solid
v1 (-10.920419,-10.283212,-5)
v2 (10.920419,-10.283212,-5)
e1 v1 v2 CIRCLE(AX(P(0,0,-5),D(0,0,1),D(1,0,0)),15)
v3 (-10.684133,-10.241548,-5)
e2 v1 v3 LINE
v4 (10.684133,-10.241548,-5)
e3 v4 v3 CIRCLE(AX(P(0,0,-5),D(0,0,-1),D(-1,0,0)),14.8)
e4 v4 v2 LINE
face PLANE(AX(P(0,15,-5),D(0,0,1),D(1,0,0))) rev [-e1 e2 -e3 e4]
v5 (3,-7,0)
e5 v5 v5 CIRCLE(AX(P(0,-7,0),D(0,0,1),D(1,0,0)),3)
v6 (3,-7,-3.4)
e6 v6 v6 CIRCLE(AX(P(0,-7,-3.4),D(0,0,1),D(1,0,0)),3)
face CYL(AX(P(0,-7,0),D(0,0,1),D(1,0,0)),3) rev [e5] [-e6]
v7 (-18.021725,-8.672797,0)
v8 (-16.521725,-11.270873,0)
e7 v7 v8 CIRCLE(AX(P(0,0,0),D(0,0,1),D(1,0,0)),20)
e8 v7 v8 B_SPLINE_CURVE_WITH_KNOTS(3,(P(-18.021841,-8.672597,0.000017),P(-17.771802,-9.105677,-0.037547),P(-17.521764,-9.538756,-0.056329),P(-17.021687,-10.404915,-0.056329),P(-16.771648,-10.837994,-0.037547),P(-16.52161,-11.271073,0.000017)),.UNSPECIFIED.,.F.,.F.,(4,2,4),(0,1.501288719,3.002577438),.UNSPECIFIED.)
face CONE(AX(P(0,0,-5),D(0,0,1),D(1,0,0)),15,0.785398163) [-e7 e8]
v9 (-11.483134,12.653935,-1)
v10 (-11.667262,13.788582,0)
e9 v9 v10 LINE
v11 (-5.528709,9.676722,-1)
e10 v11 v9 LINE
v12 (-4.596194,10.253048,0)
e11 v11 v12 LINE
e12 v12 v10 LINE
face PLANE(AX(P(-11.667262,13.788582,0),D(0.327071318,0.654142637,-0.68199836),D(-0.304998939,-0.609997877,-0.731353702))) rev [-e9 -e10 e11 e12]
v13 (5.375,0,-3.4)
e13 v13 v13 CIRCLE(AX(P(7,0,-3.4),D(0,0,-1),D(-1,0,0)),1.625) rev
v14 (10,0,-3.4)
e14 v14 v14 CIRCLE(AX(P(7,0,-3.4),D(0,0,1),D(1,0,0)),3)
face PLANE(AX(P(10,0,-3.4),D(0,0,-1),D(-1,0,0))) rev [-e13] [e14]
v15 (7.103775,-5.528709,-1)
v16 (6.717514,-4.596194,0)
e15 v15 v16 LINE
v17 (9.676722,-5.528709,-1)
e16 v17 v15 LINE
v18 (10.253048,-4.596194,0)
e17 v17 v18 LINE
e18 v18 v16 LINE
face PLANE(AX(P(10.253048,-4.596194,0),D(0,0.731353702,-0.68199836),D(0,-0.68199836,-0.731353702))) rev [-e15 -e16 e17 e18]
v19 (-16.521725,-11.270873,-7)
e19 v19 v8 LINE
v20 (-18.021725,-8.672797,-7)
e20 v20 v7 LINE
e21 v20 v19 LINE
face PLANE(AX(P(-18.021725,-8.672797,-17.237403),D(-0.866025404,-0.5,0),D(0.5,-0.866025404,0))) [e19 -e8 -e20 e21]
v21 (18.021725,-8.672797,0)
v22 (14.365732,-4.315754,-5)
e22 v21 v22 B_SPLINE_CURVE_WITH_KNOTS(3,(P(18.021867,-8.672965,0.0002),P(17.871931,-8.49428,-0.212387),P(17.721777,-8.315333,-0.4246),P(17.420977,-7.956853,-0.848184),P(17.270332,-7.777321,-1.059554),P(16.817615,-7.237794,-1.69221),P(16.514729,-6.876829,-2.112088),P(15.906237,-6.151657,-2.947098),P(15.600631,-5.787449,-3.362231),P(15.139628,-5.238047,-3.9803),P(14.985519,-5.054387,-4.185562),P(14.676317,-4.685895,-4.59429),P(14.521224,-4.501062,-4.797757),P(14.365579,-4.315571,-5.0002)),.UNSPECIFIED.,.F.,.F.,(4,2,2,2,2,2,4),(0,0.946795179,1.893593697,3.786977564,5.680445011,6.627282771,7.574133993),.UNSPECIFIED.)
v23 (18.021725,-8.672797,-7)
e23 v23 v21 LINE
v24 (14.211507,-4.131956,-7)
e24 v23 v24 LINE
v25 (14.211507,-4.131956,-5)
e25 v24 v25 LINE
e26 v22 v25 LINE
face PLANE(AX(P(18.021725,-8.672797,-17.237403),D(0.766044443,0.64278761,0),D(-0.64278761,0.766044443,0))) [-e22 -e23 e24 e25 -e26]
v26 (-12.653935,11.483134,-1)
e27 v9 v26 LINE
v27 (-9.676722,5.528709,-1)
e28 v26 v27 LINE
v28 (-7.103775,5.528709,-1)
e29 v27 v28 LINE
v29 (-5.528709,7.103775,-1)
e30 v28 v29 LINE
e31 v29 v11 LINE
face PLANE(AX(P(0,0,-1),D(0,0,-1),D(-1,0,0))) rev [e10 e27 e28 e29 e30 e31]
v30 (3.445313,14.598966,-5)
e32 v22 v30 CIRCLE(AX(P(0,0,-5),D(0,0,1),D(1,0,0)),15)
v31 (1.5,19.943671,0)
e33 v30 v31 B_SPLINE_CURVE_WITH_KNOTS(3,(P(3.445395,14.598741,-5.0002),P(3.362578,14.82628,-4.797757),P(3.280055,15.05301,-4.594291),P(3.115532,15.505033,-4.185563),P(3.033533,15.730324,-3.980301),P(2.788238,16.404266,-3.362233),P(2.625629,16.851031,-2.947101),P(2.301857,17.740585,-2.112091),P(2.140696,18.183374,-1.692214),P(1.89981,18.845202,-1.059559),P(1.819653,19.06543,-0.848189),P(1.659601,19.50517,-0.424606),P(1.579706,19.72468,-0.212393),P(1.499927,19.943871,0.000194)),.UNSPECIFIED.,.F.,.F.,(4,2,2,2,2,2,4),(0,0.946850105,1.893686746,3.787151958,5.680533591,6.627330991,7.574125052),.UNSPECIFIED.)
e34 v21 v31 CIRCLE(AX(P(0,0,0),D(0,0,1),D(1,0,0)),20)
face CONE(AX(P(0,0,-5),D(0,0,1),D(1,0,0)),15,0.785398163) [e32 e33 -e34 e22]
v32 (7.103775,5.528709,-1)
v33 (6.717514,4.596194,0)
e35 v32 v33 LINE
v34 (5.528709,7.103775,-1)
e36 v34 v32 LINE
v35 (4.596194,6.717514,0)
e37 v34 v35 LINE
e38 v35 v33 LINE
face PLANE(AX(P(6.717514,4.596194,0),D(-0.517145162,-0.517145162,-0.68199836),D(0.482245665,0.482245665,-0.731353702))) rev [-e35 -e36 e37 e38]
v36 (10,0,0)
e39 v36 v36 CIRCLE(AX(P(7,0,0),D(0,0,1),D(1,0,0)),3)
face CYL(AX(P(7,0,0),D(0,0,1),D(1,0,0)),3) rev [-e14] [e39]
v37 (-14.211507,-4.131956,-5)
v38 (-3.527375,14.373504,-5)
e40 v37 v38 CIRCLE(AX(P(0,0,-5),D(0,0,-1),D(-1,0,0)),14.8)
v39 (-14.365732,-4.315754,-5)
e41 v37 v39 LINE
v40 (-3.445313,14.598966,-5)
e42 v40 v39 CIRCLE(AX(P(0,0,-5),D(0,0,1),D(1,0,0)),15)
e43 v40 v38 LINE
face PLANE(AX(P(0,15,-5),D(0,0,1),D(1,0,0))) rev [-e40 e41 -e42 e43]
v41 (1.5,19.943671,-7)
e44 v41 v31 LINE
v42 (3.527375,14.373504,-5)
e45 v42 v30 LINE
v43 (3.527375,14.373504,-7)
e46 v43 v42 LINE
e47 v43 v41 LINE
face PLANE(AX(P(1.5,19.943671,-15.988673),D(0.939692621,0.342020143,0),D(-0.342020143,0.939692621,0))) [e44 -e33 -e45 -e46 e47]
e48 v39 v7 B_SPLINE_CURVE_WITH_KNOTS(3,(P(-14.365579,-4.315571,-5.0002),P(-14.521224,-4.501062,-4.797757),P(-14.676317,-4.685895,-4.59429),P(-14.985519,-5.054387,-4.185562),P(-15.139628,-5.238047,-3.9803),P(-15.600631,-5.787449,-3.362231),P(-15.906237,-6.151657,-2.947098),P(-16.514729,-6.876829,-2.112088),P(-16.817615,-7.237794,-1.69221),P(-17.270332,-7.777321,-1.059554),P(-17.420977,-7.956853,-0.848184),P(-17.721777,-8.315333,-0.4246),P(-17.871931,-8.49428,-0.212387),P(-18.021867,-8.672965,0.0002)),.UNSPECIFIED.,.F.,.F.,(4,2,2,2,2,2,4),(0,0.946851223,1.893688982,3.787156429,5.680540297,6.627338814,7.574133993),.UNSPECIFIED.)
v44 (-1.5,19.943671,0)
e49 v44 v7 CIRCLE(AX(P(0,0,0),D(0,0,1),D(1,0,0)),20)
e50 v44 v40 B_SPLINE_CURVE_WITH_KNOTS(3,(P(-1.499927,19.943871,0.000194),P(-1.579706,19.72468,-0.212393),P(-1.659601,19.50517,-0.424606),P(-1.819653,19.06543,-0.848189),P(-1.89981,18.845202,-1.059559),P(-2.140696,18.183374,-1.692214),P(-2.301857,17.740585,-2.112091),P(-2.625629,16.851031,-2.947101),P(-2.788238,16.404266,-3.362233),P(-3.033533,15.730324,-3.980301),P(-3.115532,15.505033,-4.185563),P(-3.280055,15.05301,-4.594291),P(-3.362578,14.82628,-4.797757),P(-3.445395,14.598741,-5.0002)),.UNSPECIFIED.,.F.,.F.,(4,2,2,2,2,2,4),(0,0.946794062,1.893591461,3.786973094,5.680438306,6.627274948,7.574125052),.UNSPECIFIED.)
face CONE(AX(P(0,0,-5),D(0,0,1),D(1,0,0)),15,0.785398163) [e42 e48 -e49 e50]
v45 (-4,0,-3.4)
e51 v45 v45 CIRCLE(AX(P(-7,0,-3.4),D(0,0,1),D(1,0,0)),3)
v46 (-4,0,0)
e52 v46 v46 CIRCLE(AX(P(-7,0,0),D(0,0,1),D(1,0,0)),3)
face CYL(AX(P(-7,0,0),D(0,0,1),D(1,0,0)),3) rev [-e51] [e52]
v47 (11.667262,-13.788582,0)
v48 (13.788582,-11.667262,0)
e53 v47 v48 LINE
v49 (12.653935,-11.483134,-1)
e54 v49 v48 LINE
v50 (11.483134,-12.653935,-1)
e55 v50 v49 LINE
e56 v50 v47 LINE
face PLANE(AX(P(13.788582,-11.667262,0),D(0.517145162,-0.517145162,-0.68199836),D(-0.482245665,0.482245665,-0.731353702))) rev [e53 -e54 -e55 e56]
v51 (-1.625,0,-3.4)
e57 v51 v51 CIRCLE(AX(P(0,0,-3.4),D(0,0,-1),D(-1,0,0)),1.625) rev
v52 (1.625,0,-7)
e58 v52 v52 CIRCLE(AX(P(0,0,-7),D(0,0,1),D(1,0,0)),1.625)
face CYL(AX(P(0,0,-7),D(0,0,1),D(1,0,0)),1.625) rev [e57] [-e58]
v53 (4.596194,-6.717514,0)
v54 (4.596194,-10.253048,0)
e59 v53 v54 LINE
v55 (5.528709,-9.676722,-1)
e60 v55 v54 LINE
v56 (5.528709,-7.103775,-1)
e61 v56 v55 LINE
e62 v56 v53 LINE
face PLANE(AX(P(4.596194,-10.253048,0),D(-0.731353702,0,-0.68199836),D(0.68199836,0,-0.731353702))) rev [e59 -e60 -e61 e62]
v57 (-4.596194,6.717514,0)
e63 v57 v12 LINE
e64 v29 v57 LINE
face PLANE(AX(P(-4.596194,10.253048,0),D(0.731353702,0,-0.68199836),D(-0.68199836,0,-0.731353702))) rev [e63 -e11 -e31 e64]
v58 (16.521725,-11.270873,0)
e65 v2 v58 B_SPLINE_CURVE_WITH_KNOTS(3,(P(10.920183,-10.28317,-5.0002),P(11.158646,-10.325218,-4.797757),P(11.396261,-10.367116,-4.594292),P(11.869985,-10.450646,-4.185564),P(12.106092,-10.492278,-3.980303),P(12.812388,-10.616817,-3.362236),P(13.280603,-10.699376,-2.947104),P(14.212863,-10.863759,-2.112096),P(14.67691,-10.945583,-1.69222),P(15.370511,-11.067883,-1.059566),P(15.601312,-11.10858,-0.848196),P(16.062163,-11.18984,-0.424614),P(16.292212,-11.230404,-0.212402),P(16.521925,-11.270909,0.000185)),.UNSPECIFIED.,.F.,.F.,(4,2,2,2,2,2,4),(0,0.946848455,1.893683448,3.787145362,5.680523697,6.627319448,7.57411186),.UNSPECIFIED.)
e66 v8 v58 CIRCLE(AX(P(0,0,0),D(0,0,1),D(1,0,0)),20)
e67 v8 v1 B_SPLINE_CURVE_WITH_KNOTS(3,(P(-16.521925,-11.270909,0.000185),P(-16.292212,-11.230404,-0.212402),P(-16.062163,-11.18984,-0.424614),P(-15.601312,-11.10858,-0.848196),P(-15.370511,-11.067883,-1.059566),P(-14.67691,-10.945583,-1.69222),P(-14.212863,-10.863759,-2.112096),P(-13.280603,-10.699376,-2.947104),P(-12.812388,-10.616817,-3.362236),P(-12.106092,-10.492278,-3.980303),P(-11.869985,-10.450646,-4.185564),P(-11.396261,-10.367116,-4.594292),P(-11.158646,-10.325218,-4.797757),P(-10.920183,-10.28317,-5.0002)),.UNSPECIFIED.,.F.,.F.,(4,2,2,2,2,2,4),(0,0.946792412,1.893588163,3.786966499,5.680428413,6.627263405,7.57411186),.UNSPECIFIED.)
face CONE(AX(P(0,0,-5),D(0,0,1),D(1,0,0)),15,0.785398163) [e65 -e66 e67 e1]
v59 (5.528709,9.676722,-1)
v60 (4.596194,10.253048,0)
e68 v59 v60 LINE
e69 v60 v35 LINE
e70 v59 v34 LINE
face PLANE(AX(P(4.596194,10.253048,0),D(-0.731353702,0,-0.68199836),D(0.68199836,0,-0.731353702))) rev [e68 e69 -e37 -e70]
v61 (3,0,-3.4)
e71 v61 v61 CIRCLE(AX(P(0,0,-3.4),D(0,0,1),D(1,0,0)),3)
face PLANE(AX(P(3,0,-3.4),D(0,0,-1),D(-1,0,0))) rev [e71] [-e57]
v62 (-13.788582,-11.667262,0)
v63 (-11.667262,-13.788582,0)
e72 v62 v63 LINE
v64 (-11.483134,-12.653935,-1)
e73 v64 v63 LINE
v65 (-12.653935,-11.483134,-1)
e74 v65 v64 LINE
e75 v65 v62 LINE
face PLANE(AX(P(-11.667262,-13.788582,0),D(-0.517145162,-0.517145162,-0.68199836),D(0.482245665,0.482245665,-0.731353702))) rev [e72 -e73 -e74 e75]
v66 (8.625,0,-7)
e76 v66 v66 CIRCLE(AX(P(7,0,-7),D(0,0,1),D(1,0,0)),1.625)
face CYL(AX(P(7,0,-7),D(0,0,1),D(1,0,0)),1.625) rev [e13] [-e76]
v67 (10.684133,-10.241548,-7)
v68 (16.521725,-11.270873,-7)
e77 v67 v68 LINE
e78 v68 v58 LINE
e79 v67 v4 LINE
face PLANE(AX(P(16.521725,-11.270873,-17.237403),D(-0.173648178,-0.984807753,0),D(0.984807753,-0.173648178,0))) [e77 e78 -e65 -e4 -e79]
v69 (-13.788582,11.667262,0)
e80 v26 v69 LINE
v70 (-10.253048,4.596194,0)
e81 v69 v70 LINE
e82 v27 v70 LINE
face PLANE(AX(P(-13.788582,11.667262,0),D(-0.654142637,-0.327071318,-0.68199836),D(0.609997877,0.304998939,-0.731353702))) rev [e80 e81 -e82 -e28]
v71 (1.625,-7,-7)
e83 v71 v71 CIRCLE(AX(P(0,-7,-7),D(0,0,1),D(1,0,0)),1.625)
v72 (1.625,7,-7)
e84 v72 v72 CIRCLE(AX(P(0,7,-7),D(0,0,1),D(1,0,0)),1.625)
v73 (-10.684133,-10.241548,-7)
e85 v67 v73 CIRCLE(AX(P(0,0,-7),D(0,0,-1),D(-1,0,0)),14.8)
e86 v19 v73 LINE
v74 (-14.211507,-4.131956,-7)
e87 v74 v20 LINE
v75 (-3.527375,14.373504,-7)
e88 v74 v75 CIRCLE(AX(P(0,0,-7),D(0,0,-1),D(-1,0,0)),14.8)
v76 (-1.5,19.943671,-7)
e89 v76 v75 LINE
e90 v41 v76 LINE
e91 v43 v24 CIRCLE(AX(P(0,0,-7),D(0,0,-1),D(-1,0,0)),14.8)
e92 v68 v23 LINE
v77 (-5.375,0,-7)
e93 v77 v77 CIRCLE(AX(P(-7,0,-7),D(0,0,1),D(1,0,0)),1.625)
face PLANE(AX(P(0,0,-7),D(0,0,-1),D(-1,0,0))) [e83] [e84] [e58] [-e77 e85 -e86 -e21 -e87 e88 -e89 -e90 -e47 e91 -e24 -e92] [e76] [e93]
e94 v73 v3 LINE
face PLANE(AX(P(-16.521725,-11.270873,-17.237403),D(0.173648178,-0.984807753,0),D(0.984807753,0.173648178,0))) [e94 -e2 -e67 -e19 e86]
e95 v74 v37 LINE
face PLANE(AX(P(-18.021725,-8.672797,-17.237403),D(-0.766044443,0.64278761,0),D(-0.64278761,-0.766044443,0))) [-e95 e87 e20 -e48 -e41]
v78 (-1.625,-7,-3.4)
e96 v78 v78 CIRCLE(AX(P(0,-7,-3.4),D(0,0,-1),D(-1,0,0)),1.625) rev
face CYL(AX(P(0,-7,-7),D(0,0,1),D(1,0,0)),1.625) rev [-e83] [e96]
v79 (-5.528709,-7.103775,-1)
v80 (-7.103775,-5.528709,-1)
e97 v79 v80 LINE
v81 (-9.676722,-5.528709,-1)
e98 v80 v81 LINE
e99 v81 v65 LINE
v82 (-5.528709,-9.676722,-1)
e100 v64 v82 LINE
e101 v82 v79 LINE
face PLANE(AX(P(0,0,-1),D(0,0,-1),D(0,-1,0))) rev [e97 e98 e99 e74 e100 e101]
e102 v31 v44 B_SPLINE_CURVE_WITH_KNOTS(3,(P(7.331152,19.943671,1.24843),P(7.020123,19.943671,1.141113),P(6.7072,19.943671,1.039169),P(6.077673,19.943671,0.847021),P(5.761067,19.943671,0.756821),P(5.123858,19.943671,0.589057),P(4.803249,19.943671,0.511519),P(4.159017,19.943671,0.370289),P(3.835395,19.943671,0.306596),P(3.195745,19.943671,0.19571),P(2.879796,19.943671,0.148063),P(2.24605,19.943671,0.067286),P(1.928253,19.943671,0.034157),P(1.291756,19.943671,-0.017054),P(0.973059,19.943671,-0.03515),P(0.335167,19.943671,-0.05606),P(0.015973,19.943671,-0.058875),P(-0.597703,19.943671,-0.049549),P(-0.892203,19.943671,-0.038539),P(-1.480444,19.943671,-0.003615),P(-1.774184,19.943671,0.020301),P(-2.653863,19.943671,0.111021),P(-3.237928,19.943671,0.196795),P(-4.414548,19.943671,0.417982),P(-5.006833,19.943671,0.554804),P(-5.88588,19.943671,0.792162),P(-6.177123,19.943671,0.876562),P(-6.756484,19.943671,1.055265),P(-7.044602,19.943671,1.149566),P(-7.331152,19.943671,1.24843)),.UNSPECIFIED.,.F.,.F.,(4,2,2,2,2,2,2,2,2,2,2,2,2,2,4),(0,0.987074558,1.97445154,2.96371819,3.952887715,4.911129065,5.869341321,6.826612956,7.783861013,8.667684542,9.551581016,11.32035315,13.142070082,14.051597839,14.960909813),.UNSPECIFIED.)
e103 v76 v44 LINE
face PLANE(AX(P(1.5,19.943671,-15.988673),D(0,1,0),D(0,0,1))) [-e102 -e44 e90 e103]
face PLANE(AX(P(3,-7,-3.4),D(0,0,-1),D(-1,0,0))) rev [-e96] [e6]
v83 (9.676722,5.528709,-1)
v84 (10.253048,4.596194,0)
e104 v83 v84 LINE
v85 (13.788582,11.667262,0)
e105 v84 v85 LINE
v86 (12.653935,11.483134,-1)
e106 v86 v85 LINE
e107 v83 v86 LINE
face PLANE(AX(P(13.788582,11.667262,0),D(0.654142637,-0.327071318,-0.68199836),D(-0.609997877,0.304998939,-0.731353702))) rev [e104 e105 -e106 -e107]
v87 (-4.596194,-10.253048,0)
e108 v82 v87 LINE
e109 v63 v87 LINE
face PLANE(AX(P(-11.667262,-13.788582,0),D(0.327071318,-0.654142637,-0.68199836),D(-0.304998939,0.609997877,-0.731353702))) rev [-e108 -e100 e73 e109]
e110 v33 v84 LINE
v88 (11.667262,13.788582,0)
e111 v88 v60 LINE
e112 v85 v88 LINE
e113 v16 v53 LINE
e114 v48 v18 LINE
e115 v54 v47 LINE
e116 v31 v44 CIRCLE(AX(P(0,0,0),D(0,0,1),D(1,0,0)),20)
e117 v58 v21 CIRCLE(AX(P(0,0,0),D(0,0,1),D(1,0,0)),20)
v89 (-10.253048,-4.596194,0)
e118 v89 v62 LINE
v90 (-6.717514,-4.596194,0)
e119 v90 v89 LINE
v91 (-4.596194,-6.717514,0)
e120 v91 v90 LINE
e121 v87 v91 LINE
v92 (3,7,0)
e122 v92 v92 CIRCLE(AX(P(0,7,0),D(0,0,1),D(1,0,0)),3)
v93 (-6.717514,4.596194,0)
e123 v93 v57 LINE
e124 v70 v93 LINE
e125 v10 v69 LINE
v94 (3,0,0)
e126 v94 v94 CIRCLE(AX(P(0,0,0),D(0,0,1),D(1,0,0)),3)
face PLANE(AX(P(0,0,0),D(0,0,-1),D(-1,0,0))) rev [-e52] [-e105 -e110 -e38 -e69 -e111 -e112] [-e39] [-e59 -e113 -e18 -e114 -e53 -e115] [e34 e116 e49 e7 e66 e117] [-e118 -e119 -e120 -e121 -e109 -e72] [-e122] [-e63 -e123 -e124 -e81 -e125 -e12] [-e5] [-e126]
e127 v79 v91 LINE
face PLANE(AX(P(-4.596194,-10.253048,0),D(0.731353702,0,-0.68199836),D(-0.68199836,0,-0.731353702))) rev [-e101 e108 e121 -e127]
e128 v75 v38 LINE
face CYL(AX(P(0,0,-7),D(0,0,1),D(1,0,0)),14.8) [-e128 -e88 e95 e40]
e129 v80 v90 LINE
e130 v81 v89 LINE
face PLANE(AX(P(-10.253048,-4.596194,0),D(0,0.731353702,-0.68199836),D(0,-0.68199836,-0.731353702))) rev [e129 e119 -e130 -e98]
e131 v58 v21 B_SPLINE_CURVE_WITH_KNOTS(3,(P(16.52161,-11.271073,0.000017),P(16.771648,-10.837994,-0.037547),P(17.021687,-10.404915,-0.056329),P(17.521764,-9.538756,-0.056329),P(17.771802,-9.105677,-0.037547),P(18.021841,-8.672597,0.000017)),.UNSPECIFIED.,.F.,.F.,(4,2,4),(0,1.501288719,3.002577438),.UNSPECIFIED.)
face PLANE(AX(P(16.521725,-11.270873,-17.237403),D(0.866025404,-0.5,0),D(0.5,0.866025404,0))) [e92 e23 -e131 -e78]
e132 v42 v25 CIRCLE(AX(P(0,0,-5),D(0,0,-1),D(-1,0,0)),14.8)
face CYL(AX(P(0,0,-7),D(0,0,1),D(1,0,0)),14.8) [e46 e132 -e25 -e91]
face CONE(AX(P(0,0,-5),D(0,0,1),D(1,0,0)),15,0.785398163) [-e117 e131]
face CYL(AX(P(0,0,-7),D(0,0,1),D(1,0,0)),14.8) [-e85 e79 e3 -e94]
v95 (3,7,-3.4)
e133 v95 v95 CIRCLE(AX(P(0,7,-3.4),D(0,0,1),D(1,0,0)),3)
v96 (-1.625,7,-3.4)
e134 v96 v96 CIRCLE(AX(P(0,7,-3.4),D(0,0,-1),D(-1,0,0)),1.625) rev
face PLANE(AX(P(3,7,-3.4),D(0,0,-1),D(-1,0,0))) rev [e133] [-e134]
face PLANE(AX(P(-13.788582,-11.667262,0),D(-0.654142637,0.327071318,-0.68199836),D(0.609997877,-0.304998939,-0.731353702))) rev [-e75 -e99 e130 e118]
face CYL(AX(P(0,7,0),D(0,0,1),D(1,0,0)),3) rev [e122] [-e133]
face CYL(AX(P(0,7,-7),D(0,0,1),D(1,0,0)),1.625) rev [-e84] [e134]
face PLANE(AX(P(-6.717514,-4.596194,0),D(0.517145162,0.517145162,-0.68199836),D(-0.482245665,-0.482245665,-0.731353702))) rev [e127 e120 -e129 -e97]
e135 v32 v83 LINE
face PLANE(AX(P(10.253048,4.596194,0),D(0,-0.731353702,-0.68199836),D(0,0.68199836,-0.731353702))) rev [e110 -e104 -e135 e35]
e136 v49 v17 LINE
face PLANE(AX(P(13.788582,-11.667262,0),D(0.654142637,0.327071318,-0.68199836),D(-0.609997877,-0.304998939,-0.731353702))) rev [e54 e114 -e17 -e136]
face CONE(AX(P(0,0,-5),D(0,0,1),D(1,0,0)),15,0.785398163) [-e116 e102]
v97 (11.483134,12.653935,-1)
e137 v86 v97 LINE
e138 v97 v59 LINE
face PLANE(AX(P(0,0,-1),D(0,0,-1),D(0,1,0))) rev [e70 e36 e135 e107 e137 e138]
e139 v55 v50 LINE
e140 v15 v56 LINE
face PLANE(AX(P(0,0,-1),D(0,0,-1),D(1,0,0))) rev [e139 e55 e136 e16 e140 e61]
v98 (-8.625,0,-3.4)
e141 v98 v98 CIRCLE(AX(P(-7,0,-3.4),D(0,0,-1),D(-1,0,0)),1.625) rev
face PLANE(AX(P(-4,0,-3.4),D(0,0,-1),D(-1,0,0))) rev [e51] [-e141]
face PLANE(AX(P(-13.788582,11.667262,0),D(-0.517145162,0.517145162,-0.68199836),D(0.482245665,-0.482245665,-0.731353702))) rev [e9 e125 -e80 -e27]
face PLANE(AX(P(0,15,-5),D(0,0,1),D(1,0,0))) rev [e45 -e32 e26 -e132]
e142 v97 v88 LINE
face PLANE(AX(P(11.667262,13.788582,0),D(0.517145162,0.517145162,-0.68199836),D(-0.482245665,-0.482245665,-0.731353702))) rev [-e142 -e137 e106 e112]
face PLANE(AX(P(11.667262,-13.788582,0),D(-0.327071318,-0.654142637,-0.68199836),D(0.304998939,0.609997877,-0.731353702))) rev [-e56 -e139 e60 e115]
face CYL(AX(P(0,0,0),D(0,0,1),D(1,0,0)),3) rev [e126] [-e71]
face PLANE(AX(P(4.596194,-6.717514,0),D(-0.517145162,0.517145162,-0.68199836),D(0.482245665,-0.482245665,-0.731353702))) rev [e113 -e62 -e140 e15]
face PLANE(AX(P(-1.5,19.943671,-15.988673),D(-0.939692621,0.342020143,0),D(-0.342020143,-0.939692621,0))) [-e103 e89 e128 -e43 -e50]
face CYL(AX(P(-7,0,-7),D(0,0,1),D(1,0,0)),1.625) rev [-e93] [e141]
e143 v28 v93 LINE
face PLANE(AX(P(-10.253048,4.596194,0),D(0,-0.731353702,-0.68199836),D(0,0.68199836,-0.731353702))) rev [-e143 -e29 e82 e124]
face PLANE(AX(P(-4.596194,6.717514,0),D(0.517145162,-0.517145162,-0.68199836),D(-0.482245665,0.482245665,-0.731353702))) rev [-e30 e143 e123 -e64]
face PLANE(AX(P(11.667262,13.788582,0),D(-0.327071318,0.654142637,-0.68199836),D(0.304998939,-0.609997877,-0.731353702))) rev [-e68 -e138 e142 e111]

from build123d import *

# Parameters (mm, degrees)
ESQUISSE3_R                         = 14.8
BOSS_EXTRU_1_DEPTH                  = 2
BOSS_EXTRU_2_REACH                  = 31.138
R_P_TITION_CIRCULAIRE1_COUNT        = 3
ENL_V_MAT_EXTRU_1_DEPTH             = 30.137604569
ENL_V_MAT_EXTRU_1_DEPTH_BACK        = 30.137604569
ESQUISSE5_R                         = 1.625
PER_AGEAVANC_1_START                = -3.4
PER_AGEAVANC_1_OUTLINE_R            = 3
PER_AGEAVANC_1_OUTLINE_R_2          = 1.625
PER_AGEAVANC_1_DEPTH                = 3.4000121
ENL_V_MAT_EXTRU_2_DEPTH             = 1
ENL_V_MAT_EXTRU_2_DRAFT             = -43
R_P_TITION_CIRCULAIRE2_COPY_1_DEPTH = 1
R_P_TITION_CIRCULAIRE2_COPY_1_DRAFT = -43
R_P_TITION_CIRCULAIRE2_COPY_2_DEPTH = 1
R_P_TITION_CIRCULAIRE2_COPY_2_DRAFT = -43
R_P_TITION_CIRCULAIRE2_COPY_3_DEPTH = 1
R_P_TITION_CIRCULAIRE2_COPY_3_DRAFT = -43


with BuildPart() as part:
    # Esquisse2 → Révolution1 (revolve)
    with BuildSketch(Plane(origin=(0, 0, 0), x_dir=(0, 0, -1), z_dir=(1, 0, 0)), mode=Mode.PRIVATE) as r_volution1_sk:
        Polygon((0, 0), (0, 20), (5, 15), (5, 0), align=None)
    revolve(r_volution1_sk.sketch.rotate(Axis((0, 0, 0), (0, 0, -1)), 90), axis=Axis((0, 0, 0), (0, 0, -1)))

    # Esquisse3 → Boss.-Extru.1 (add)
    with BuildSketch(Plane(origin=(0, 0, -5), x_dir=(-1, 0, 0), z_dir=(0, 0, -1))):
        Circle(ESQUISSE3_R)
    extrude(amount=BOSS_EXTRU_1_DEPTH)

    # Boss.-Extru.2: up to this face of the body (flat: up to its plane)
    boss_extru_2_end = Plane(part.part.faces().sort_by_distance((0, 0, -7))[0])
    # Esquisse4 → Boss.-Extru.2 (add, up to the picked face)
    with BuildSketch(Plane.XY, mode=Mode.PRIVATE) as boss_extru_2_sk1:
        with BuildLine():
            Line((1.5, 19.943670675), (-1.5, 19.943670675))
            Line((-1.5, 19.943670675), (-3.52737474, 14.373504355))
            ThreePointArc((-3.52737474, 14.373504355), (0, 14.8), (3.52737474, 14.373504355))
            Line((3.52737474, 14.373504355), (1.5, 19.943670675))
        make_face()
    boss_extru_2_tool1 = split(extrude(boss_extru_2_sk1.sketch, amount=-BOSS_EXTRU_2_REACH, mode=Mode.PRIVATE), bisect_by=boss_extru_2_end, keep=Keep.BOTH, mode=Mode.PRIVATE)
    boss_extru_2 = boss_extru_2_tool1.solids().sort_by(Axis((0, 16.957577, 0), (0, 0, -1)))[0]
    add(boss_extru_2)

    # Répétition circulaire1: Boss.-Extru.2 ×3 about axis
    r_p_tition_circulaire1_axis = Axis((0, 0, 0), (0, 0, 1))
    for i in range(1, R_P_TITION_CIRCULAIRE1_COUNT):
        add(boss_extru_2.rotate(r_p_tition_circulaire1_axis, i * 360 / R_P_TITION_CIRCULAIRE1_COUNT))

    # Esquisse5 → Enlèv. mat.-Extru.1 (cut, two sides: drawn at the far end of the back side and taken through both)
    with BuildSketch(Plane.XY.offset(-ENL_V_MAT_EXTRU_1_DEPTH_BACK)):
        with Locations((0, 7)):
            Circle(ESQUISSE5_R)
        Circle(ESQUISSE5_R)
        with Locations((7, 0)):
            Circle(ESQUISSE5_R)
        with Locations((0, -7)):
            Circle(ESQUISSE5_R)
        with Locations((-7, 0)):
            Circle(ESQUISSE5_R)
    extrude(amount=ENL_V_MAT_EXTRU_1_DEPTH + ENL_V_MAT_EXTRU_1_DEPTH_BACK, mode=Mode.SUBTRACT)

    # PerçageAvancé1: read off the stored shape, not the designer's step
    # PerçageAvancé1 outline → PerçageAvancé1 (cut)
    # profile 1 of 5: a face of its own
    with BuildSketch(Plane.XY.offset(PER_AGEAVANC_1_START)):
        with Locations((0, -7)):
            Circle(PER_AGEAVANC_1_OUTLINE_R)
        with Locations((0, -7)):
            Circle(PER_AGEAVANC_1_OUTLINE_R_2, mode=Mode.SUBTRACT)
    # profile 2 of 5: a face of its own
    with BuildSketch(Plane.XY.offset(PER_AGEAVANC_1_START)):
        with Locations((7, 0)):
            Circle(PER_AGEAVANC_1_OUTLINE_R)
        with Locations((7, 0)):
            Circle(PER_AGEAVANC_1_OUTLINE_R_2, mode=Mode.SUBTRACT)
    # profile 3 of 5: a face of its own
    with BuildSketch(Plane.XY.offset(PER_AGEAVANC_1_START)):
        Circle(PER_AGEAVANC_1_OUTLINE_R)
        Circle(PER_AGEAVANC_1_OUTLINE_R_2, mode=Mode.SUBTRACT)
    # profile 4 of 5: a face of its own
    with BuildSketch(Plane.XY.offset(PER_AGEAVANC_1_START)):
        with Locations((0, 7)):
            Circle(PER_AGEAVANC_1_OUTLINE_R)
        with Locations((0, 7)):
            Circle(PER_AGEAVANC_1_OUTLINE_R_2, mode=Mode.SUBTRACT)
    # profile 5 of 5: a face of its own
    with BuildSketch(Plane.XY.offset(PER_AGEAVANC_1_START)):
        with Locations((-7, 0)):
            Circle(PER_AGEAVANC_1_OUTLINE_R)
        with Locations((-7, 0)):
            Circle(PER_AGEAVANC_1_OUTLINE_R_2, mode=Mode.SUBTRACT)
    extrude(amount=PER_AGEAVANC_1_DEPTH, mode=Mode.SUBTRACT)


with BuildPart() as enl_v_mat_extru_2_tool:
    # Esquisse9 → Enlèv. mat.-Extru.2 (with draft: the straight prism first)
    with BuildSketch(Plane.XY):
        Polygon((-13.788582233, 11.66726189), (-10.253048327, 4.596194078), (-6.717514421, 4.596194078), (-4.596194078, 6.717514421), (-4.596194078, 10.253048327), (-11.66726189, 13.788582233), align=None)
    extrude(amount=-ENL_V_MAT_EXTRU_2_DEPTH)
    # Enlèv. mat.-Extru.2: the draft: its side faces are tilted about the plane it starts from
    enl_v_mat_extru_2_sides = [enl_v_mat_extru_2_tool.faces().sort_by_distance(p)[0] for p in [
        (-12.02081528, 8.131727984, -0.5),
        (-8.485281374, 4.596194078, -0.5),
        (-5.656854249, 5.656854249, -0.5),
        (-4.596194078, 8.485281374, -0.5),
        (-8.131727984, 12.02081528, -0.5),
        (-12.727922061, 12.727922061, -0.5),
    ]]
    draft(enl_v_mat_extru_2_sides, Plane.XY, ENL_V_MAT_EXTRU_2_DRAFT)


with BuildPart() as part_1:
    add(part.part)

    # Enlèv. mat.-Extru.2: cut by enl_v_mat_extru_2_tool
    add(enl_v_mat_extru_2_tool.part, mode=Mode.SUBTRACT)


with BuildPart() as r_p_tition_circulaire2_copy_1_tool:
    # Répétition circulaire2 copy 1 sketch → Répétition circulaire2 copy 1 (with draft: the straight prism first)
    with BuildSketch(Plane(origin=(0, 0, 0), x_dir=(0, 1, 0), z_dir=(0, 0, 1))):
        Polygon((-13.788582233, 11.66726189), (-10.253048327, 4.596194078), (-6.717514421, 4.596194078), (-4.596194078, 6.717514421), (-4.596194078, 10.253048327), (-11.66726189, 13.788582233), align=None)
    extrude(amount=-R_P_TITION_CIRCULAIRE2_COPY_1_DEPTH)
    # Répétition circulaire2 copy 1: the draft: its side faces are tilted about the plane it starts from
    r_p_tition_circulaire2_copy_1_sides = [r_p_tition_circulaire2_copy_1_tool.faces().sort_by_distance(p)[0] for p in [
        (-8.131727984, -12.02081528, -0.5),
        (-4.596194078, -8.485281374, -0.5),
        (-5.656854249, -5.656854249, -0.5),
        (-8.485281374, -4.596194078, -0.5),
        (-12.02081528, -8.131727984, -0.5),
        (-12.727922061, -12.727922061, -0.5),
    ]]
    draft(r_p_tition_circulaire2_copy_1_sides, Plane(origin=(0, 0, 0), x_dir=(0, 1, 0), z_dir=(0, 0, 1)), R_P_TITION_CIRCULAIRE2_COPY_1_DRAFT)


with BuildPart() as part_2:
    add(part_1.part)

    # Répétition circulaire2 copy 1: cut by r_p_tition_circulaire2_copy_1_tool
    add(r_p_tition_circulaire2_copy_1_tool.part, mode=Mode.SUBTRACT)


with BuildPart() as r_p_tition_circulaire2_copy_2_tool:
    # Répétition circulaire2 copy 2 sketch → Répétition circulaire2 copy 2 (with draft: the straight prism first)
    with BuildSketch(Plane(origin=(0, 0, 0), x_dir=(-1, 0, 0), z_dir=(0, 0, 1))):
        Polygon((-13.788582233, 11.66726189), (-10.253048327, 4.596194078), (-6.717514421, 4.596194078), (-4.596194078, 6.717514421), (-4.596194078, 10.253048327), (-11.66726189, 13.788582233), align=None)
    extrude(amount=-R_P_TITION_CIRCULAIRE2_COPY_2_DEPTH)
    # Répétition circulaire2 copy 2: the draft: its side faces are tilted about the plane it starts from
    r_p_tition_circulaire2_copy_2_sides = [r_p_tition_circulaire2_copy_2_tool.faces().sort_by_distance(p)[0] for p in [
        (12.02081528, -8.131727984, -0.5),
        (8.485281374, -4.596194078, -0.5),
        (5.656854249, -5.656854249, -0.5),
        (4.596194078, -8.485281374, -0.5),
        (8.131727984, -12.02081528, -0.5),
        (12.727922061, -12.727922061, -0.5),
    ]]
    draft(r_p_tition_circulaire2_copy_2_sides, Plane(origin=(0, 0, 0), x_dir=(-1, 0, 0), z_dir=(0, 0, 1)), R_P_TITION_CIRCULAIRE2_COPY_2_DRAFT)


with BuildPart() as part_3:
    add(part_2.part)

    # Répétition circulaire2 copy 2: cut by r_p_tition_circulaire2_copy_2_tool
    add(r_p_tition_circulaire2_copy_2_tool.part, mode=Mode.SUBTRACT)


with BuildPart() as r_p_tition_circulaire2_copy_3_tool:
    # Répétition circulaire2 copy 3 sketch → Répétition circulaire2 copy 3 (with draft: the straight prism first)
    with BuildSketch(Plane(origin=(0, 0, 0), x_dir=(0, -1, 0), z_dir=(0, 0, 1))):
        Polygon((-13.788582233, 11.66726189), (-10.253048327, 4.596194078), (-6.717514421, 4.596194078), (-4.596194078, 6.717514421), (-4.596194078, 10.253048327), (-11.66726189, 13.788582233), align=None)
    extrude(amount=-R_P_TITION_CIRCULAIRE2_COPY_3_DEPTH)
    # Répétition circulaire2 copy 3: the draft: its side faces are tilted about the plane it starts from
    r_p_tition_circulaire2_copy_3_sides = [r_p_tition_circulaire2_copy_3_tool.faces().sort_by_distance(p)[0] for p in [
        (8.131727984, 12.02081528, -0.5),
        (4.596194078, 8.485281374, -0.5),
        (5.656854249, 5.656854249, -0.5),
        (8.485281374, 4.596194078, -0.5),
        (12.02081528, 8.131727984, -0.5),
        (12.727922061, 12.727922061, -0.5),
    ]]
    draft(r_p_tition_circulaire2_copy_3_sides, Plane(origin=(0, 0, 0), x_dir=(0, -1, 0), z_dir=(0, 0, 1)), R_P_TITION_CIRCULAIRE2_COPY_3_DRAFT)


with BuildPart() as part_4:
    add(part_3.part)

    # Répétition circulaire2 copy 3: cut by r_p_tition_circulaire2_copy_3_tool
    add(r_p_tition_circulaire2_copy_3_tool.part, mode=Mode.SUBTRACT)


solid = part_4.part
